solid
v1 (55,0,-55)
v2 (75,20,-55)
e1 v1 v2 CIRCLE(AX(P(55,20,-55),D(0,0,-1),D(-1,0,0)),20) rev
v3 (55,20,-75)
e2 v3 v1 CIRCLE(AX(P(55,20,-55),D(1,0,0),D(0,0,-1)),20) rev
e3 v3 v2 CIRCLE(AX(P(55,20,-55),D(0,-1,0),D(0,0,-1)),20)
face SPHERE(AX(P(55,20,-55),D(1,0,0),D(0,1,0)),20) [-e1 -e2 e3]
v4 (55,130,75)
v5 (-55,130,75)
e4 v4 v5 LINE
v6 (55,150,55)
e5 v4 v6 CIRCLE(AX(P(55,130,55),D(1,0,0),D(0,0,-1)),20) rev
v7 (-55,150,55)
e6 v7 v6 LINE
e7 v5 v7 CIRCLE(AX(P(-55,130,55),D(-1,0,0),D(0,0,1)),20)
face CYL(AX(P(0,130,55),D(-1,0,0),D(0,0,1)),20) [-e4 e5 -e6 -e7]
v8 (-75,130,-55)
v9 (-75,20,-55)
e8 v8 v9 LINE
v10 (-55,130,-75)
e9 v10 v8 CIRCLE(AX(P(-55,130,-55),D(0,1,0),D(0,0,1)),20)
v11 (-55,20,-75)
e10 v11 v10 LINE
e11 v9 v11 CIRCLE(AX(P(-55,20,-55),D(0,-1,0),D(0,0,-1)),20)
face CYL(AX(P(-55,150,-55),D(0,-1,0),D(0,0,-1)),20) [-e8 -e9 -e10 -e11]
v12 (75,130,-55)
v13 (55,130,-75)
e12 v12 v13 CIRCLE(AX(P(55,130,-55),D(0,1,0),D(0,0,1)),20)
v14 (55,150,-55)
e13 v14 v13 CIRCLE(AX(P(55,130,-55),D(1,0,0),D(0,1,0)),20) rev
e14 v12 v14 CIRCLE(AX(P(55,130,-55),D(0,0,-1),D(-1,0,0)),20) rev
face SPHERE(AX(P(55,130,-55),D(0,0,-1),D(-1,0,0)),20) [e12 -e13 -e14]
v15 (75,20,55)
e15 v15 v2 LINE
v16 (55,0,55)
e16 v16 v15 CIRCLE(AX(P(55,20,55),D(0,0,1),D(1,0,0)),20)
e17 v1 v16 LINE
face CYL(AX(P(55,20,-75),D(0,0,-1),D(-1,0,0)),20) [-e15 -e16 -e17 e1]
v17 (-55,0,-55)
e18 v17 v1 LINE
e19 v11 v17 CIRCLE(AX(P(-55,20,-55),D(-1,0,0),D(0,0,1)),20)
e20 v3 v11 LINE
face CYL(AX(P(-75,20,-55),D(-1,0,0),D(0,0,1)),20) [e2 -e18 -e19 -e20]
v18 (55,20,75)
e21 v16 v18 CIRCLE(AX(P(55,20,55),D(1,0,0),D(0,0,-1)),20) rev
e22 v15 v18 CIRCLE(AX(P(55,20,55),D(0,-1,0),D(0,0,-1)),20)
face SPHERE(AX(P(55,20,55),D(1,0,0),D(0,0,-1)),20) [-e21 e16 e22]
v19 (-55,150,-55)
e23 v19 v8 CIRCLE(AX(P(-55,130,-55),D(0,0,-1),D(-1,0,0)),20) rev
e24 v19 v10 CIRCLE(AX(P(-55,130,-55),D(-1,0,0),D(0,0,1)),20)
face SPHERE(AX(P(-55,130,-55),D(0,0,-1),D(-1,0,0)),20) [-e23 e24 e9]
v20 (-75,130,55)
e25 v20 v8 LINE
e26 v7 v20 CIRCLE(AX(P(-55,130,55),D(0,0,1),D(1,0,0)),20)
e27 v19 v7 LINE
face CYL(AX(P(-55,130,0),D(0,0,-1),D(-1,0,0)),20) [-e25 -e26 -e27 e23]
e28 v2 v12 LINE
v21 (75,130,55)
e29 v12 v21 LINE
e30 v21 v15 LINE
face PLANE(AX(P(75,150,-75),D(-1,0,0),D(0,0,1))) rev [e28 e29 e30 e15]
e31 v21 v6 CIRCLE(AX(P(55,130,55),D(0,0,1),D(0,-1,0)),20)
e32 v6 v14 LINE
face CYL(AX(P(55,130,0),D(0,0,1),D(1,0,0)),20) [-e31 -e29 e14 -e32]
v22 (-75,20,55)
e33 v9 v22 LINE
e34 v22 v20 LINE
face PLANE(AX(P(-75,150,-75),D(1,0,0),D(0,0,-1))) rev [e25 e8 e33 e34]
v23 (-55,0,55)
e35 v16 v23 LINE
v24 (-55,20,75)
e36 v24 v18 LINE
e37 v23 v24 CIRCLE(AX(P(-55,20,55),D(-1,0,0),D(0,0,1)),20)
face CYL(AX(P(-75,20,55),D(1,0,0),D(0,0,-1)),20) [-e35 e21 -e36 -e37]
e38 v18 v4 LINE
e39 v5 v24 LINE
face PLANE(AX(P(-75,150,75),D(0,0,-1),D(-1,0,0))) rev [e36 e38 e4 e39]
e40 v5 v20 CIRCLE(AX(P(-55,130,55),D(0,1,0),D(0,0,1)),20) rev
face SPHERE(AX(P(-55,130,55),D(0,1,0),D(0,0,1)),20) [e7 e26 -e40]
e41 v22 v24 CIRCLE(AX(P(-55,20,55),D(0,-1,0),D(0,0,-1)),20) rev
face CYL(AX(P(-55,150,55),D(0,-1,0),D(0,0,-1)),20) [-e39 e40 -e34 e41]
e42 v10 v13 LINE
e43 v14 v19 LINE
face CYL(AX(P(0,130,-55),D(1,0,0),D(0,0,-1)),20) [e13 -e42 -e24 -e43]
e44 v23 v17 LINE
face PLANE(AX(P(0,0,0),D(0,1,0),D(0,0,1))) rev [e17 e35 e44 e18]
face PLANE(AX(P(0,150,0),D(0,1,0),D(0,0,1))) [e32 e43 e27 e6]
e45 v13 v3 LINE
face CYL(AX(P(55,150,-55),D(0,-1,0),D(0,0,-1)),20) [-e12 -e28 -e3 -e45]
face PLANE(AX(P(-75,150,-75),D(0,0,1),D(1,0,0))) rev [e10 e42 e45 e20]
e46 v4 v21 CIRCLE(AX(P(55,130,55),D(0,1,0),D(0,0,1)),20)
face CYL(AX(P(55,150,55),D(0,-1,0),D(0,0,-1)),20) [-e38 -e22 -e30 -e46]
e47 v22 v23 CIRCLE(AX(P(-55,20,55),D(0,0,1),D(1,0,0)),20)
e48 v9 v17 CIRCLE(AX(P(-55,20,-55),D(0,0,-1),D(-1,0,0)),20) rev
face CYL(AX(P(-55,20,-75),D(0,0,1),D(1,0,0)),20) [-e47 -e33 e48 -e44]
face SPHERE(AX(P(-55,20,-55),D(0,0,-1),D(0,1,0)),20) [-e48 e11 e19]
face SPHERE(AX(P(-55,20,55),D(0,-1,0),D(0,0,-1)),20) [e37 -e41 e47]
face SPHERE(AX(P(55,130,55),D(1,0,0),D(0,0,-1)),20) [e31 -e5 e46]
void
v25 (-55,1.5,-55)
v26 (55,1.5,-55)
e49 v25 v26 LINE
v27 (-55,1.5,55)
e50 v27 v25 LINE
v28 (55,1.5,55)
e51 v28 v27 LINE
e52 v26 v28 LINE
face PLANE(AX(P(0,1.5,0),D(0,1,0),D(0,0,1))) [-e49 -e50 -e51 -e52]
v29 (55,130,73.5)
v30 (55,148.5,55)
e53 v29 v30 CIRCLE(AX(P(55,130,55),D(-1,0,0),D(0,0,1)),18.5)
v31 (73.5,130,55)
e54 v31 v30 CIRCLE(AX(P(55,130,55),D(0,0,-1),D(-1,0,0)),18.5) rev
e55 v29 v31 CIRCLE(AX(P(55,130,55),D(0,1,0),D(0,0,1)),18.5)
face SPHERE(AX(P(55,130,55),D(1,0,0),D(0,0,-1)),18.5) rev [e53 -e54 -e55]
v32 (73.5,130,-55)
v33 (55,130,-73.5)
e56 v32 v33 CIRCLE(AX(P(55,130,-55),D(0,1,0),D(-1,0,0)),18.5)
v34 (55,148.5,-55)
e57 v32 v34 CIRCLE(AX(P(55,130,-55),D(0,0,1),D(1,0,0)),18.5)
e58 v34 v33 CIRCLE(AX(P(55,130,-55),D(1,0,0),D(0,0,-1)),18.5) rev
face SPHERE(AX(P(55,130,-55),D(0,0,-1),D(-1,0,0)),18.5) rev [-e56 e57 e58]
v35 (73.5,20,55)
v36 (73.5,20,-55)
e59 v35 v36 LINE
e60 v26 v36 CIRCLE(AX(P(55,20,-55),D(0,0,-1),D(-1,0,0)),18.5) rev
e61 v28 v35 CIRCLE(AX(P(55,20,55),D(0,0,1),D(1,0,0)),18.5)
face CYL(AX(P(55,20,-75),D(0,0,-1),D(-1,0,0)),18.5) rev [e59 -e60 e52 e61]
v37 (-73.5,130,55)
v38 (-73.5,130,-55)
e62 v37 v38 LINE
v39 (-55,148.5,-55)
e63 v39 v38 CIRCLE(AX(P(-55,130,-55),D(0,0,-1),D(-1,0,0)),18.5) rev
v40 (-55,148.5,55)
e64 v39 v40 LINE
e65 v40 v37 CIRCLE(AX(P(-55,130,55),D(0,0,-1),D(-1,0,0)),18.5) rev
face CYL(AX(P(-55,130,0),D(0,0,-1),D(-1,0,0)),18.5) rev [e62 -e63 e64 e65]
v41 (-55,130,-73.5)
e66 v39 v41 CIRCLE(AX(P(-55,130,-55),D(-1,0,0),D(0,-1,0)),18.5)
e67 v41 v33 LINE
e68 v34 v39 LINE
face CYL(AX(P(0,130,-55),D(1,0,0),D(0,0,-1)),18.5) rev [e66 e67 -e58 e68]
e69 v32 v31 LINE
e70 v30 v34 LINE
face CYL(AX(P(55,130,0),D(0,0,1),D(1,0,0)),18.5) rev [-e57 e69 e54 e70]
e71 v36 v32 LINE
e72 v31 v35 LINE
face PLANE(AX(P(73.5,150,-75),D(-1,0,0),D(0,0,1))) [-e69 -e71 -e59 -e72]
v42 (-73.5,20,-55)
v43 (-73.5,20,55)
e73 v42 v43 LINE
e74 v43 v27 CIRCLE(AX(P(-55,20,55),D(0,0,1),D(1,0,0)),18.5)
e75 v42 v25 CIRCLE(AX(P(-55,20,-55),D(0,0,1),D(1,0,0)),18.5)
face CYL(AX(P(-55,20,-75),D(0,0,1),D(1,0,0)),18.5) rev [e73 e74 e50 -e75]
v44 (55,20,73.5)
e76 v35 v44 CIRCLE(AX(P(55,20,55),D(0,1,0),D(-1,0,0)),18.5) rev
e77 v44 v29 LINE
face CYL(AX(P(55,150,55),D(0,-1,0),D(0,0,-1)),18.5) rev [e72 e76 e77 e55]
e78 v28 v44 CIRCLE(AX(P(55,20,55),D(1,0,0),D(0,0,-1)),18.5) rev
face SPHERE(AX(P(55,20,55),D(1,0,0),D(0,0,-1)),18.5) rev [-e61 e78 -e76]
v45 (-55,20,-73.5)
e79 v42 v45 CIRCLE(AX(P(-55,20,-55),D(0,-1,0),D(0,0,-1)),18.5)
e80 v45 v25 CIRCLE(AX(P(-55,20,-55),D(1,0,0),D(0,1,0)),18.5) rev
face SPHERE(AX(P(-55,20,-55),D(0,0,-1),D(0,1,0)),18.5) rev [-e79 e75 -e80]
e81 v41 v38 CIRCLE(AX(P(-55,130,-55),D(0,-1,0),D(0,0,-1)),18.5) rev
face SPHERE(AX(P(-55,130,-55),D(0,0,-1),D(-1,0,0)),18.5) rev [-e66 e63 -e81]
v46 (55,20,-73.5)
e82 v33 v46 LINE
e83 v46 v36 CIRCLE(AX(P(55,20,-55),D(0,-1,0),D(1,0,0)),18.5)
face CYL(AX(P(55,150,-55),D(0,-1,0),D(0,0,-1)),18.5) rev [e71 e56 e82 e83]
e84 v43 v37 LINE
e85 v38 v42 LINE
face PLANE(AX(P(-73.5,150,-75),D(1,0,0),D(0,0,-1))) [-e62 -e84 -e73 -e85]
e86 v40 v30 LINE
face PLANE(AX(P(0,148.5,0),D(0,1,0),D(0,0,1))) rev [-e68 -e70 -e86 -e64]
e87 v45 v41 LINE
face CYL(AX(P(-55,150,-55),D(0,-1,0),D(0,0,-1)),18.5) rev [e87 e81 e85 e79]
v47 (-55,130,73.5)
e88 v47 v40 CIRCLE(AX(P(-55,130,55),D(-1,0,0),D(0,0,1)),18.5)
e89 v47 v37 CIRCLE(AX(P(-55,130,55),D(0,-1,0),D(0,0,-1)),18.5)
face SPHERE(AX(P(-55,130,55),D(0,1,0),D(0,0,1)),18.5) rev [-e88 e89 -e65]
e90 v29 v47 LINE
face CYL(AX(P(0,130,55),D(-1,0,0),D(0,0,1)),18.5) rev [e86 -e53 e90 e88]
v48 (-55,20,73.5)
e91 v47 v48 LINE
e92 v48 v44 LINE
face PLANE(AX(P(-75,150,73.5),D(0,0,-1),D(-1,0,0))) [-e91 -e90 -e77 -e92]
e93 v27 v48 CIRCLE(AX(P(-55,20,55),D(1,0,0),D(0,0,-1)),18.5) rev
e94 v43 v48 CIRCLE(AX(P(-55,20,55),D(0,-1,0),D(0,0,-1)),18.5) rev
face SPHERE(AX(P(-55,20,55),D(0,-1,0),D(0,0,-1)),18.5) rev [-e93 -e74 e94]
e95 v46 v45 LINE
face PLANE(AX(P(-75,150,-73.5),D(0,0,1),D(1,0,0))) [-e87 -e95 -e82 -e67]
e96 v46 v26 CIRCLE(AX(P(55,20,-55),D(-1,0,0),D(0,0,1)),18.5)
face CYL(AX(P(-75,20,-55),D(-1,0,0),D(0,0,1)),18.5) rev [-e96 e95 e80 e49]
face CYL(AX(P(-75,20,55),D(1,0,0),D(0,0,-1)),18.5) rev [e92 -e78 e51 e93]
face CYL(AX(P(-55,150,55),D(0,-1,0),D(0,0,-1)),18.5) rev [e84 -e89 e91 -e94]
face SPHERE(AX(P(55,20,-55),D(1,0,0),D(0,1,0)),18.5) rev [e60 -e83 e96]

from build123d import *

# Parameters (mm, degrees)
SKETCH1_W           = 150
SKETCH1_H           = 150
BOSS_EXTRUDE1_DEPTH = 150
FILLET1_R           = 20
SHELL1_T            = 1.5


with BuildPart() as part:
    # Sketch1 → Boss-Extrude1 (new body)
    with BuildSketch(Plane(origin=(0, 0, 0), x_dir=(1, 0, 0), z_dir=(0, 1, 0))):
        Rectangle(SKETCH1_W, SKETCH1_H)
    extrude(amount=BOSS_EXTRUDE1_DEPTH)

    # Fillet1
    fillet1_edges = [part.edges().sort_by_distance(p)[0] for p in [
        (75, 150, 0),
        (0, 150, -75),
        (-75, 150, 0),
        (0, 0, -75),
        (75, 0, 0),
        (0, 0, 75),
        (-75, 0, 0),
        (-75, 75, -75),
        (75, 75, -75),
        (75, 75, 75),
        (-75, 75, 75),
        (0, 150, 75),
    ]]
    fillet(fillet1_edges, radius=FILLET1_R)

    # Shell1 (no face opened: a closed hollow body)
    add(offset(amount=-SHELL1_T, mode=Mode.PRIVATE), mode=Mode.SUBTRACT)


solid = part.part
